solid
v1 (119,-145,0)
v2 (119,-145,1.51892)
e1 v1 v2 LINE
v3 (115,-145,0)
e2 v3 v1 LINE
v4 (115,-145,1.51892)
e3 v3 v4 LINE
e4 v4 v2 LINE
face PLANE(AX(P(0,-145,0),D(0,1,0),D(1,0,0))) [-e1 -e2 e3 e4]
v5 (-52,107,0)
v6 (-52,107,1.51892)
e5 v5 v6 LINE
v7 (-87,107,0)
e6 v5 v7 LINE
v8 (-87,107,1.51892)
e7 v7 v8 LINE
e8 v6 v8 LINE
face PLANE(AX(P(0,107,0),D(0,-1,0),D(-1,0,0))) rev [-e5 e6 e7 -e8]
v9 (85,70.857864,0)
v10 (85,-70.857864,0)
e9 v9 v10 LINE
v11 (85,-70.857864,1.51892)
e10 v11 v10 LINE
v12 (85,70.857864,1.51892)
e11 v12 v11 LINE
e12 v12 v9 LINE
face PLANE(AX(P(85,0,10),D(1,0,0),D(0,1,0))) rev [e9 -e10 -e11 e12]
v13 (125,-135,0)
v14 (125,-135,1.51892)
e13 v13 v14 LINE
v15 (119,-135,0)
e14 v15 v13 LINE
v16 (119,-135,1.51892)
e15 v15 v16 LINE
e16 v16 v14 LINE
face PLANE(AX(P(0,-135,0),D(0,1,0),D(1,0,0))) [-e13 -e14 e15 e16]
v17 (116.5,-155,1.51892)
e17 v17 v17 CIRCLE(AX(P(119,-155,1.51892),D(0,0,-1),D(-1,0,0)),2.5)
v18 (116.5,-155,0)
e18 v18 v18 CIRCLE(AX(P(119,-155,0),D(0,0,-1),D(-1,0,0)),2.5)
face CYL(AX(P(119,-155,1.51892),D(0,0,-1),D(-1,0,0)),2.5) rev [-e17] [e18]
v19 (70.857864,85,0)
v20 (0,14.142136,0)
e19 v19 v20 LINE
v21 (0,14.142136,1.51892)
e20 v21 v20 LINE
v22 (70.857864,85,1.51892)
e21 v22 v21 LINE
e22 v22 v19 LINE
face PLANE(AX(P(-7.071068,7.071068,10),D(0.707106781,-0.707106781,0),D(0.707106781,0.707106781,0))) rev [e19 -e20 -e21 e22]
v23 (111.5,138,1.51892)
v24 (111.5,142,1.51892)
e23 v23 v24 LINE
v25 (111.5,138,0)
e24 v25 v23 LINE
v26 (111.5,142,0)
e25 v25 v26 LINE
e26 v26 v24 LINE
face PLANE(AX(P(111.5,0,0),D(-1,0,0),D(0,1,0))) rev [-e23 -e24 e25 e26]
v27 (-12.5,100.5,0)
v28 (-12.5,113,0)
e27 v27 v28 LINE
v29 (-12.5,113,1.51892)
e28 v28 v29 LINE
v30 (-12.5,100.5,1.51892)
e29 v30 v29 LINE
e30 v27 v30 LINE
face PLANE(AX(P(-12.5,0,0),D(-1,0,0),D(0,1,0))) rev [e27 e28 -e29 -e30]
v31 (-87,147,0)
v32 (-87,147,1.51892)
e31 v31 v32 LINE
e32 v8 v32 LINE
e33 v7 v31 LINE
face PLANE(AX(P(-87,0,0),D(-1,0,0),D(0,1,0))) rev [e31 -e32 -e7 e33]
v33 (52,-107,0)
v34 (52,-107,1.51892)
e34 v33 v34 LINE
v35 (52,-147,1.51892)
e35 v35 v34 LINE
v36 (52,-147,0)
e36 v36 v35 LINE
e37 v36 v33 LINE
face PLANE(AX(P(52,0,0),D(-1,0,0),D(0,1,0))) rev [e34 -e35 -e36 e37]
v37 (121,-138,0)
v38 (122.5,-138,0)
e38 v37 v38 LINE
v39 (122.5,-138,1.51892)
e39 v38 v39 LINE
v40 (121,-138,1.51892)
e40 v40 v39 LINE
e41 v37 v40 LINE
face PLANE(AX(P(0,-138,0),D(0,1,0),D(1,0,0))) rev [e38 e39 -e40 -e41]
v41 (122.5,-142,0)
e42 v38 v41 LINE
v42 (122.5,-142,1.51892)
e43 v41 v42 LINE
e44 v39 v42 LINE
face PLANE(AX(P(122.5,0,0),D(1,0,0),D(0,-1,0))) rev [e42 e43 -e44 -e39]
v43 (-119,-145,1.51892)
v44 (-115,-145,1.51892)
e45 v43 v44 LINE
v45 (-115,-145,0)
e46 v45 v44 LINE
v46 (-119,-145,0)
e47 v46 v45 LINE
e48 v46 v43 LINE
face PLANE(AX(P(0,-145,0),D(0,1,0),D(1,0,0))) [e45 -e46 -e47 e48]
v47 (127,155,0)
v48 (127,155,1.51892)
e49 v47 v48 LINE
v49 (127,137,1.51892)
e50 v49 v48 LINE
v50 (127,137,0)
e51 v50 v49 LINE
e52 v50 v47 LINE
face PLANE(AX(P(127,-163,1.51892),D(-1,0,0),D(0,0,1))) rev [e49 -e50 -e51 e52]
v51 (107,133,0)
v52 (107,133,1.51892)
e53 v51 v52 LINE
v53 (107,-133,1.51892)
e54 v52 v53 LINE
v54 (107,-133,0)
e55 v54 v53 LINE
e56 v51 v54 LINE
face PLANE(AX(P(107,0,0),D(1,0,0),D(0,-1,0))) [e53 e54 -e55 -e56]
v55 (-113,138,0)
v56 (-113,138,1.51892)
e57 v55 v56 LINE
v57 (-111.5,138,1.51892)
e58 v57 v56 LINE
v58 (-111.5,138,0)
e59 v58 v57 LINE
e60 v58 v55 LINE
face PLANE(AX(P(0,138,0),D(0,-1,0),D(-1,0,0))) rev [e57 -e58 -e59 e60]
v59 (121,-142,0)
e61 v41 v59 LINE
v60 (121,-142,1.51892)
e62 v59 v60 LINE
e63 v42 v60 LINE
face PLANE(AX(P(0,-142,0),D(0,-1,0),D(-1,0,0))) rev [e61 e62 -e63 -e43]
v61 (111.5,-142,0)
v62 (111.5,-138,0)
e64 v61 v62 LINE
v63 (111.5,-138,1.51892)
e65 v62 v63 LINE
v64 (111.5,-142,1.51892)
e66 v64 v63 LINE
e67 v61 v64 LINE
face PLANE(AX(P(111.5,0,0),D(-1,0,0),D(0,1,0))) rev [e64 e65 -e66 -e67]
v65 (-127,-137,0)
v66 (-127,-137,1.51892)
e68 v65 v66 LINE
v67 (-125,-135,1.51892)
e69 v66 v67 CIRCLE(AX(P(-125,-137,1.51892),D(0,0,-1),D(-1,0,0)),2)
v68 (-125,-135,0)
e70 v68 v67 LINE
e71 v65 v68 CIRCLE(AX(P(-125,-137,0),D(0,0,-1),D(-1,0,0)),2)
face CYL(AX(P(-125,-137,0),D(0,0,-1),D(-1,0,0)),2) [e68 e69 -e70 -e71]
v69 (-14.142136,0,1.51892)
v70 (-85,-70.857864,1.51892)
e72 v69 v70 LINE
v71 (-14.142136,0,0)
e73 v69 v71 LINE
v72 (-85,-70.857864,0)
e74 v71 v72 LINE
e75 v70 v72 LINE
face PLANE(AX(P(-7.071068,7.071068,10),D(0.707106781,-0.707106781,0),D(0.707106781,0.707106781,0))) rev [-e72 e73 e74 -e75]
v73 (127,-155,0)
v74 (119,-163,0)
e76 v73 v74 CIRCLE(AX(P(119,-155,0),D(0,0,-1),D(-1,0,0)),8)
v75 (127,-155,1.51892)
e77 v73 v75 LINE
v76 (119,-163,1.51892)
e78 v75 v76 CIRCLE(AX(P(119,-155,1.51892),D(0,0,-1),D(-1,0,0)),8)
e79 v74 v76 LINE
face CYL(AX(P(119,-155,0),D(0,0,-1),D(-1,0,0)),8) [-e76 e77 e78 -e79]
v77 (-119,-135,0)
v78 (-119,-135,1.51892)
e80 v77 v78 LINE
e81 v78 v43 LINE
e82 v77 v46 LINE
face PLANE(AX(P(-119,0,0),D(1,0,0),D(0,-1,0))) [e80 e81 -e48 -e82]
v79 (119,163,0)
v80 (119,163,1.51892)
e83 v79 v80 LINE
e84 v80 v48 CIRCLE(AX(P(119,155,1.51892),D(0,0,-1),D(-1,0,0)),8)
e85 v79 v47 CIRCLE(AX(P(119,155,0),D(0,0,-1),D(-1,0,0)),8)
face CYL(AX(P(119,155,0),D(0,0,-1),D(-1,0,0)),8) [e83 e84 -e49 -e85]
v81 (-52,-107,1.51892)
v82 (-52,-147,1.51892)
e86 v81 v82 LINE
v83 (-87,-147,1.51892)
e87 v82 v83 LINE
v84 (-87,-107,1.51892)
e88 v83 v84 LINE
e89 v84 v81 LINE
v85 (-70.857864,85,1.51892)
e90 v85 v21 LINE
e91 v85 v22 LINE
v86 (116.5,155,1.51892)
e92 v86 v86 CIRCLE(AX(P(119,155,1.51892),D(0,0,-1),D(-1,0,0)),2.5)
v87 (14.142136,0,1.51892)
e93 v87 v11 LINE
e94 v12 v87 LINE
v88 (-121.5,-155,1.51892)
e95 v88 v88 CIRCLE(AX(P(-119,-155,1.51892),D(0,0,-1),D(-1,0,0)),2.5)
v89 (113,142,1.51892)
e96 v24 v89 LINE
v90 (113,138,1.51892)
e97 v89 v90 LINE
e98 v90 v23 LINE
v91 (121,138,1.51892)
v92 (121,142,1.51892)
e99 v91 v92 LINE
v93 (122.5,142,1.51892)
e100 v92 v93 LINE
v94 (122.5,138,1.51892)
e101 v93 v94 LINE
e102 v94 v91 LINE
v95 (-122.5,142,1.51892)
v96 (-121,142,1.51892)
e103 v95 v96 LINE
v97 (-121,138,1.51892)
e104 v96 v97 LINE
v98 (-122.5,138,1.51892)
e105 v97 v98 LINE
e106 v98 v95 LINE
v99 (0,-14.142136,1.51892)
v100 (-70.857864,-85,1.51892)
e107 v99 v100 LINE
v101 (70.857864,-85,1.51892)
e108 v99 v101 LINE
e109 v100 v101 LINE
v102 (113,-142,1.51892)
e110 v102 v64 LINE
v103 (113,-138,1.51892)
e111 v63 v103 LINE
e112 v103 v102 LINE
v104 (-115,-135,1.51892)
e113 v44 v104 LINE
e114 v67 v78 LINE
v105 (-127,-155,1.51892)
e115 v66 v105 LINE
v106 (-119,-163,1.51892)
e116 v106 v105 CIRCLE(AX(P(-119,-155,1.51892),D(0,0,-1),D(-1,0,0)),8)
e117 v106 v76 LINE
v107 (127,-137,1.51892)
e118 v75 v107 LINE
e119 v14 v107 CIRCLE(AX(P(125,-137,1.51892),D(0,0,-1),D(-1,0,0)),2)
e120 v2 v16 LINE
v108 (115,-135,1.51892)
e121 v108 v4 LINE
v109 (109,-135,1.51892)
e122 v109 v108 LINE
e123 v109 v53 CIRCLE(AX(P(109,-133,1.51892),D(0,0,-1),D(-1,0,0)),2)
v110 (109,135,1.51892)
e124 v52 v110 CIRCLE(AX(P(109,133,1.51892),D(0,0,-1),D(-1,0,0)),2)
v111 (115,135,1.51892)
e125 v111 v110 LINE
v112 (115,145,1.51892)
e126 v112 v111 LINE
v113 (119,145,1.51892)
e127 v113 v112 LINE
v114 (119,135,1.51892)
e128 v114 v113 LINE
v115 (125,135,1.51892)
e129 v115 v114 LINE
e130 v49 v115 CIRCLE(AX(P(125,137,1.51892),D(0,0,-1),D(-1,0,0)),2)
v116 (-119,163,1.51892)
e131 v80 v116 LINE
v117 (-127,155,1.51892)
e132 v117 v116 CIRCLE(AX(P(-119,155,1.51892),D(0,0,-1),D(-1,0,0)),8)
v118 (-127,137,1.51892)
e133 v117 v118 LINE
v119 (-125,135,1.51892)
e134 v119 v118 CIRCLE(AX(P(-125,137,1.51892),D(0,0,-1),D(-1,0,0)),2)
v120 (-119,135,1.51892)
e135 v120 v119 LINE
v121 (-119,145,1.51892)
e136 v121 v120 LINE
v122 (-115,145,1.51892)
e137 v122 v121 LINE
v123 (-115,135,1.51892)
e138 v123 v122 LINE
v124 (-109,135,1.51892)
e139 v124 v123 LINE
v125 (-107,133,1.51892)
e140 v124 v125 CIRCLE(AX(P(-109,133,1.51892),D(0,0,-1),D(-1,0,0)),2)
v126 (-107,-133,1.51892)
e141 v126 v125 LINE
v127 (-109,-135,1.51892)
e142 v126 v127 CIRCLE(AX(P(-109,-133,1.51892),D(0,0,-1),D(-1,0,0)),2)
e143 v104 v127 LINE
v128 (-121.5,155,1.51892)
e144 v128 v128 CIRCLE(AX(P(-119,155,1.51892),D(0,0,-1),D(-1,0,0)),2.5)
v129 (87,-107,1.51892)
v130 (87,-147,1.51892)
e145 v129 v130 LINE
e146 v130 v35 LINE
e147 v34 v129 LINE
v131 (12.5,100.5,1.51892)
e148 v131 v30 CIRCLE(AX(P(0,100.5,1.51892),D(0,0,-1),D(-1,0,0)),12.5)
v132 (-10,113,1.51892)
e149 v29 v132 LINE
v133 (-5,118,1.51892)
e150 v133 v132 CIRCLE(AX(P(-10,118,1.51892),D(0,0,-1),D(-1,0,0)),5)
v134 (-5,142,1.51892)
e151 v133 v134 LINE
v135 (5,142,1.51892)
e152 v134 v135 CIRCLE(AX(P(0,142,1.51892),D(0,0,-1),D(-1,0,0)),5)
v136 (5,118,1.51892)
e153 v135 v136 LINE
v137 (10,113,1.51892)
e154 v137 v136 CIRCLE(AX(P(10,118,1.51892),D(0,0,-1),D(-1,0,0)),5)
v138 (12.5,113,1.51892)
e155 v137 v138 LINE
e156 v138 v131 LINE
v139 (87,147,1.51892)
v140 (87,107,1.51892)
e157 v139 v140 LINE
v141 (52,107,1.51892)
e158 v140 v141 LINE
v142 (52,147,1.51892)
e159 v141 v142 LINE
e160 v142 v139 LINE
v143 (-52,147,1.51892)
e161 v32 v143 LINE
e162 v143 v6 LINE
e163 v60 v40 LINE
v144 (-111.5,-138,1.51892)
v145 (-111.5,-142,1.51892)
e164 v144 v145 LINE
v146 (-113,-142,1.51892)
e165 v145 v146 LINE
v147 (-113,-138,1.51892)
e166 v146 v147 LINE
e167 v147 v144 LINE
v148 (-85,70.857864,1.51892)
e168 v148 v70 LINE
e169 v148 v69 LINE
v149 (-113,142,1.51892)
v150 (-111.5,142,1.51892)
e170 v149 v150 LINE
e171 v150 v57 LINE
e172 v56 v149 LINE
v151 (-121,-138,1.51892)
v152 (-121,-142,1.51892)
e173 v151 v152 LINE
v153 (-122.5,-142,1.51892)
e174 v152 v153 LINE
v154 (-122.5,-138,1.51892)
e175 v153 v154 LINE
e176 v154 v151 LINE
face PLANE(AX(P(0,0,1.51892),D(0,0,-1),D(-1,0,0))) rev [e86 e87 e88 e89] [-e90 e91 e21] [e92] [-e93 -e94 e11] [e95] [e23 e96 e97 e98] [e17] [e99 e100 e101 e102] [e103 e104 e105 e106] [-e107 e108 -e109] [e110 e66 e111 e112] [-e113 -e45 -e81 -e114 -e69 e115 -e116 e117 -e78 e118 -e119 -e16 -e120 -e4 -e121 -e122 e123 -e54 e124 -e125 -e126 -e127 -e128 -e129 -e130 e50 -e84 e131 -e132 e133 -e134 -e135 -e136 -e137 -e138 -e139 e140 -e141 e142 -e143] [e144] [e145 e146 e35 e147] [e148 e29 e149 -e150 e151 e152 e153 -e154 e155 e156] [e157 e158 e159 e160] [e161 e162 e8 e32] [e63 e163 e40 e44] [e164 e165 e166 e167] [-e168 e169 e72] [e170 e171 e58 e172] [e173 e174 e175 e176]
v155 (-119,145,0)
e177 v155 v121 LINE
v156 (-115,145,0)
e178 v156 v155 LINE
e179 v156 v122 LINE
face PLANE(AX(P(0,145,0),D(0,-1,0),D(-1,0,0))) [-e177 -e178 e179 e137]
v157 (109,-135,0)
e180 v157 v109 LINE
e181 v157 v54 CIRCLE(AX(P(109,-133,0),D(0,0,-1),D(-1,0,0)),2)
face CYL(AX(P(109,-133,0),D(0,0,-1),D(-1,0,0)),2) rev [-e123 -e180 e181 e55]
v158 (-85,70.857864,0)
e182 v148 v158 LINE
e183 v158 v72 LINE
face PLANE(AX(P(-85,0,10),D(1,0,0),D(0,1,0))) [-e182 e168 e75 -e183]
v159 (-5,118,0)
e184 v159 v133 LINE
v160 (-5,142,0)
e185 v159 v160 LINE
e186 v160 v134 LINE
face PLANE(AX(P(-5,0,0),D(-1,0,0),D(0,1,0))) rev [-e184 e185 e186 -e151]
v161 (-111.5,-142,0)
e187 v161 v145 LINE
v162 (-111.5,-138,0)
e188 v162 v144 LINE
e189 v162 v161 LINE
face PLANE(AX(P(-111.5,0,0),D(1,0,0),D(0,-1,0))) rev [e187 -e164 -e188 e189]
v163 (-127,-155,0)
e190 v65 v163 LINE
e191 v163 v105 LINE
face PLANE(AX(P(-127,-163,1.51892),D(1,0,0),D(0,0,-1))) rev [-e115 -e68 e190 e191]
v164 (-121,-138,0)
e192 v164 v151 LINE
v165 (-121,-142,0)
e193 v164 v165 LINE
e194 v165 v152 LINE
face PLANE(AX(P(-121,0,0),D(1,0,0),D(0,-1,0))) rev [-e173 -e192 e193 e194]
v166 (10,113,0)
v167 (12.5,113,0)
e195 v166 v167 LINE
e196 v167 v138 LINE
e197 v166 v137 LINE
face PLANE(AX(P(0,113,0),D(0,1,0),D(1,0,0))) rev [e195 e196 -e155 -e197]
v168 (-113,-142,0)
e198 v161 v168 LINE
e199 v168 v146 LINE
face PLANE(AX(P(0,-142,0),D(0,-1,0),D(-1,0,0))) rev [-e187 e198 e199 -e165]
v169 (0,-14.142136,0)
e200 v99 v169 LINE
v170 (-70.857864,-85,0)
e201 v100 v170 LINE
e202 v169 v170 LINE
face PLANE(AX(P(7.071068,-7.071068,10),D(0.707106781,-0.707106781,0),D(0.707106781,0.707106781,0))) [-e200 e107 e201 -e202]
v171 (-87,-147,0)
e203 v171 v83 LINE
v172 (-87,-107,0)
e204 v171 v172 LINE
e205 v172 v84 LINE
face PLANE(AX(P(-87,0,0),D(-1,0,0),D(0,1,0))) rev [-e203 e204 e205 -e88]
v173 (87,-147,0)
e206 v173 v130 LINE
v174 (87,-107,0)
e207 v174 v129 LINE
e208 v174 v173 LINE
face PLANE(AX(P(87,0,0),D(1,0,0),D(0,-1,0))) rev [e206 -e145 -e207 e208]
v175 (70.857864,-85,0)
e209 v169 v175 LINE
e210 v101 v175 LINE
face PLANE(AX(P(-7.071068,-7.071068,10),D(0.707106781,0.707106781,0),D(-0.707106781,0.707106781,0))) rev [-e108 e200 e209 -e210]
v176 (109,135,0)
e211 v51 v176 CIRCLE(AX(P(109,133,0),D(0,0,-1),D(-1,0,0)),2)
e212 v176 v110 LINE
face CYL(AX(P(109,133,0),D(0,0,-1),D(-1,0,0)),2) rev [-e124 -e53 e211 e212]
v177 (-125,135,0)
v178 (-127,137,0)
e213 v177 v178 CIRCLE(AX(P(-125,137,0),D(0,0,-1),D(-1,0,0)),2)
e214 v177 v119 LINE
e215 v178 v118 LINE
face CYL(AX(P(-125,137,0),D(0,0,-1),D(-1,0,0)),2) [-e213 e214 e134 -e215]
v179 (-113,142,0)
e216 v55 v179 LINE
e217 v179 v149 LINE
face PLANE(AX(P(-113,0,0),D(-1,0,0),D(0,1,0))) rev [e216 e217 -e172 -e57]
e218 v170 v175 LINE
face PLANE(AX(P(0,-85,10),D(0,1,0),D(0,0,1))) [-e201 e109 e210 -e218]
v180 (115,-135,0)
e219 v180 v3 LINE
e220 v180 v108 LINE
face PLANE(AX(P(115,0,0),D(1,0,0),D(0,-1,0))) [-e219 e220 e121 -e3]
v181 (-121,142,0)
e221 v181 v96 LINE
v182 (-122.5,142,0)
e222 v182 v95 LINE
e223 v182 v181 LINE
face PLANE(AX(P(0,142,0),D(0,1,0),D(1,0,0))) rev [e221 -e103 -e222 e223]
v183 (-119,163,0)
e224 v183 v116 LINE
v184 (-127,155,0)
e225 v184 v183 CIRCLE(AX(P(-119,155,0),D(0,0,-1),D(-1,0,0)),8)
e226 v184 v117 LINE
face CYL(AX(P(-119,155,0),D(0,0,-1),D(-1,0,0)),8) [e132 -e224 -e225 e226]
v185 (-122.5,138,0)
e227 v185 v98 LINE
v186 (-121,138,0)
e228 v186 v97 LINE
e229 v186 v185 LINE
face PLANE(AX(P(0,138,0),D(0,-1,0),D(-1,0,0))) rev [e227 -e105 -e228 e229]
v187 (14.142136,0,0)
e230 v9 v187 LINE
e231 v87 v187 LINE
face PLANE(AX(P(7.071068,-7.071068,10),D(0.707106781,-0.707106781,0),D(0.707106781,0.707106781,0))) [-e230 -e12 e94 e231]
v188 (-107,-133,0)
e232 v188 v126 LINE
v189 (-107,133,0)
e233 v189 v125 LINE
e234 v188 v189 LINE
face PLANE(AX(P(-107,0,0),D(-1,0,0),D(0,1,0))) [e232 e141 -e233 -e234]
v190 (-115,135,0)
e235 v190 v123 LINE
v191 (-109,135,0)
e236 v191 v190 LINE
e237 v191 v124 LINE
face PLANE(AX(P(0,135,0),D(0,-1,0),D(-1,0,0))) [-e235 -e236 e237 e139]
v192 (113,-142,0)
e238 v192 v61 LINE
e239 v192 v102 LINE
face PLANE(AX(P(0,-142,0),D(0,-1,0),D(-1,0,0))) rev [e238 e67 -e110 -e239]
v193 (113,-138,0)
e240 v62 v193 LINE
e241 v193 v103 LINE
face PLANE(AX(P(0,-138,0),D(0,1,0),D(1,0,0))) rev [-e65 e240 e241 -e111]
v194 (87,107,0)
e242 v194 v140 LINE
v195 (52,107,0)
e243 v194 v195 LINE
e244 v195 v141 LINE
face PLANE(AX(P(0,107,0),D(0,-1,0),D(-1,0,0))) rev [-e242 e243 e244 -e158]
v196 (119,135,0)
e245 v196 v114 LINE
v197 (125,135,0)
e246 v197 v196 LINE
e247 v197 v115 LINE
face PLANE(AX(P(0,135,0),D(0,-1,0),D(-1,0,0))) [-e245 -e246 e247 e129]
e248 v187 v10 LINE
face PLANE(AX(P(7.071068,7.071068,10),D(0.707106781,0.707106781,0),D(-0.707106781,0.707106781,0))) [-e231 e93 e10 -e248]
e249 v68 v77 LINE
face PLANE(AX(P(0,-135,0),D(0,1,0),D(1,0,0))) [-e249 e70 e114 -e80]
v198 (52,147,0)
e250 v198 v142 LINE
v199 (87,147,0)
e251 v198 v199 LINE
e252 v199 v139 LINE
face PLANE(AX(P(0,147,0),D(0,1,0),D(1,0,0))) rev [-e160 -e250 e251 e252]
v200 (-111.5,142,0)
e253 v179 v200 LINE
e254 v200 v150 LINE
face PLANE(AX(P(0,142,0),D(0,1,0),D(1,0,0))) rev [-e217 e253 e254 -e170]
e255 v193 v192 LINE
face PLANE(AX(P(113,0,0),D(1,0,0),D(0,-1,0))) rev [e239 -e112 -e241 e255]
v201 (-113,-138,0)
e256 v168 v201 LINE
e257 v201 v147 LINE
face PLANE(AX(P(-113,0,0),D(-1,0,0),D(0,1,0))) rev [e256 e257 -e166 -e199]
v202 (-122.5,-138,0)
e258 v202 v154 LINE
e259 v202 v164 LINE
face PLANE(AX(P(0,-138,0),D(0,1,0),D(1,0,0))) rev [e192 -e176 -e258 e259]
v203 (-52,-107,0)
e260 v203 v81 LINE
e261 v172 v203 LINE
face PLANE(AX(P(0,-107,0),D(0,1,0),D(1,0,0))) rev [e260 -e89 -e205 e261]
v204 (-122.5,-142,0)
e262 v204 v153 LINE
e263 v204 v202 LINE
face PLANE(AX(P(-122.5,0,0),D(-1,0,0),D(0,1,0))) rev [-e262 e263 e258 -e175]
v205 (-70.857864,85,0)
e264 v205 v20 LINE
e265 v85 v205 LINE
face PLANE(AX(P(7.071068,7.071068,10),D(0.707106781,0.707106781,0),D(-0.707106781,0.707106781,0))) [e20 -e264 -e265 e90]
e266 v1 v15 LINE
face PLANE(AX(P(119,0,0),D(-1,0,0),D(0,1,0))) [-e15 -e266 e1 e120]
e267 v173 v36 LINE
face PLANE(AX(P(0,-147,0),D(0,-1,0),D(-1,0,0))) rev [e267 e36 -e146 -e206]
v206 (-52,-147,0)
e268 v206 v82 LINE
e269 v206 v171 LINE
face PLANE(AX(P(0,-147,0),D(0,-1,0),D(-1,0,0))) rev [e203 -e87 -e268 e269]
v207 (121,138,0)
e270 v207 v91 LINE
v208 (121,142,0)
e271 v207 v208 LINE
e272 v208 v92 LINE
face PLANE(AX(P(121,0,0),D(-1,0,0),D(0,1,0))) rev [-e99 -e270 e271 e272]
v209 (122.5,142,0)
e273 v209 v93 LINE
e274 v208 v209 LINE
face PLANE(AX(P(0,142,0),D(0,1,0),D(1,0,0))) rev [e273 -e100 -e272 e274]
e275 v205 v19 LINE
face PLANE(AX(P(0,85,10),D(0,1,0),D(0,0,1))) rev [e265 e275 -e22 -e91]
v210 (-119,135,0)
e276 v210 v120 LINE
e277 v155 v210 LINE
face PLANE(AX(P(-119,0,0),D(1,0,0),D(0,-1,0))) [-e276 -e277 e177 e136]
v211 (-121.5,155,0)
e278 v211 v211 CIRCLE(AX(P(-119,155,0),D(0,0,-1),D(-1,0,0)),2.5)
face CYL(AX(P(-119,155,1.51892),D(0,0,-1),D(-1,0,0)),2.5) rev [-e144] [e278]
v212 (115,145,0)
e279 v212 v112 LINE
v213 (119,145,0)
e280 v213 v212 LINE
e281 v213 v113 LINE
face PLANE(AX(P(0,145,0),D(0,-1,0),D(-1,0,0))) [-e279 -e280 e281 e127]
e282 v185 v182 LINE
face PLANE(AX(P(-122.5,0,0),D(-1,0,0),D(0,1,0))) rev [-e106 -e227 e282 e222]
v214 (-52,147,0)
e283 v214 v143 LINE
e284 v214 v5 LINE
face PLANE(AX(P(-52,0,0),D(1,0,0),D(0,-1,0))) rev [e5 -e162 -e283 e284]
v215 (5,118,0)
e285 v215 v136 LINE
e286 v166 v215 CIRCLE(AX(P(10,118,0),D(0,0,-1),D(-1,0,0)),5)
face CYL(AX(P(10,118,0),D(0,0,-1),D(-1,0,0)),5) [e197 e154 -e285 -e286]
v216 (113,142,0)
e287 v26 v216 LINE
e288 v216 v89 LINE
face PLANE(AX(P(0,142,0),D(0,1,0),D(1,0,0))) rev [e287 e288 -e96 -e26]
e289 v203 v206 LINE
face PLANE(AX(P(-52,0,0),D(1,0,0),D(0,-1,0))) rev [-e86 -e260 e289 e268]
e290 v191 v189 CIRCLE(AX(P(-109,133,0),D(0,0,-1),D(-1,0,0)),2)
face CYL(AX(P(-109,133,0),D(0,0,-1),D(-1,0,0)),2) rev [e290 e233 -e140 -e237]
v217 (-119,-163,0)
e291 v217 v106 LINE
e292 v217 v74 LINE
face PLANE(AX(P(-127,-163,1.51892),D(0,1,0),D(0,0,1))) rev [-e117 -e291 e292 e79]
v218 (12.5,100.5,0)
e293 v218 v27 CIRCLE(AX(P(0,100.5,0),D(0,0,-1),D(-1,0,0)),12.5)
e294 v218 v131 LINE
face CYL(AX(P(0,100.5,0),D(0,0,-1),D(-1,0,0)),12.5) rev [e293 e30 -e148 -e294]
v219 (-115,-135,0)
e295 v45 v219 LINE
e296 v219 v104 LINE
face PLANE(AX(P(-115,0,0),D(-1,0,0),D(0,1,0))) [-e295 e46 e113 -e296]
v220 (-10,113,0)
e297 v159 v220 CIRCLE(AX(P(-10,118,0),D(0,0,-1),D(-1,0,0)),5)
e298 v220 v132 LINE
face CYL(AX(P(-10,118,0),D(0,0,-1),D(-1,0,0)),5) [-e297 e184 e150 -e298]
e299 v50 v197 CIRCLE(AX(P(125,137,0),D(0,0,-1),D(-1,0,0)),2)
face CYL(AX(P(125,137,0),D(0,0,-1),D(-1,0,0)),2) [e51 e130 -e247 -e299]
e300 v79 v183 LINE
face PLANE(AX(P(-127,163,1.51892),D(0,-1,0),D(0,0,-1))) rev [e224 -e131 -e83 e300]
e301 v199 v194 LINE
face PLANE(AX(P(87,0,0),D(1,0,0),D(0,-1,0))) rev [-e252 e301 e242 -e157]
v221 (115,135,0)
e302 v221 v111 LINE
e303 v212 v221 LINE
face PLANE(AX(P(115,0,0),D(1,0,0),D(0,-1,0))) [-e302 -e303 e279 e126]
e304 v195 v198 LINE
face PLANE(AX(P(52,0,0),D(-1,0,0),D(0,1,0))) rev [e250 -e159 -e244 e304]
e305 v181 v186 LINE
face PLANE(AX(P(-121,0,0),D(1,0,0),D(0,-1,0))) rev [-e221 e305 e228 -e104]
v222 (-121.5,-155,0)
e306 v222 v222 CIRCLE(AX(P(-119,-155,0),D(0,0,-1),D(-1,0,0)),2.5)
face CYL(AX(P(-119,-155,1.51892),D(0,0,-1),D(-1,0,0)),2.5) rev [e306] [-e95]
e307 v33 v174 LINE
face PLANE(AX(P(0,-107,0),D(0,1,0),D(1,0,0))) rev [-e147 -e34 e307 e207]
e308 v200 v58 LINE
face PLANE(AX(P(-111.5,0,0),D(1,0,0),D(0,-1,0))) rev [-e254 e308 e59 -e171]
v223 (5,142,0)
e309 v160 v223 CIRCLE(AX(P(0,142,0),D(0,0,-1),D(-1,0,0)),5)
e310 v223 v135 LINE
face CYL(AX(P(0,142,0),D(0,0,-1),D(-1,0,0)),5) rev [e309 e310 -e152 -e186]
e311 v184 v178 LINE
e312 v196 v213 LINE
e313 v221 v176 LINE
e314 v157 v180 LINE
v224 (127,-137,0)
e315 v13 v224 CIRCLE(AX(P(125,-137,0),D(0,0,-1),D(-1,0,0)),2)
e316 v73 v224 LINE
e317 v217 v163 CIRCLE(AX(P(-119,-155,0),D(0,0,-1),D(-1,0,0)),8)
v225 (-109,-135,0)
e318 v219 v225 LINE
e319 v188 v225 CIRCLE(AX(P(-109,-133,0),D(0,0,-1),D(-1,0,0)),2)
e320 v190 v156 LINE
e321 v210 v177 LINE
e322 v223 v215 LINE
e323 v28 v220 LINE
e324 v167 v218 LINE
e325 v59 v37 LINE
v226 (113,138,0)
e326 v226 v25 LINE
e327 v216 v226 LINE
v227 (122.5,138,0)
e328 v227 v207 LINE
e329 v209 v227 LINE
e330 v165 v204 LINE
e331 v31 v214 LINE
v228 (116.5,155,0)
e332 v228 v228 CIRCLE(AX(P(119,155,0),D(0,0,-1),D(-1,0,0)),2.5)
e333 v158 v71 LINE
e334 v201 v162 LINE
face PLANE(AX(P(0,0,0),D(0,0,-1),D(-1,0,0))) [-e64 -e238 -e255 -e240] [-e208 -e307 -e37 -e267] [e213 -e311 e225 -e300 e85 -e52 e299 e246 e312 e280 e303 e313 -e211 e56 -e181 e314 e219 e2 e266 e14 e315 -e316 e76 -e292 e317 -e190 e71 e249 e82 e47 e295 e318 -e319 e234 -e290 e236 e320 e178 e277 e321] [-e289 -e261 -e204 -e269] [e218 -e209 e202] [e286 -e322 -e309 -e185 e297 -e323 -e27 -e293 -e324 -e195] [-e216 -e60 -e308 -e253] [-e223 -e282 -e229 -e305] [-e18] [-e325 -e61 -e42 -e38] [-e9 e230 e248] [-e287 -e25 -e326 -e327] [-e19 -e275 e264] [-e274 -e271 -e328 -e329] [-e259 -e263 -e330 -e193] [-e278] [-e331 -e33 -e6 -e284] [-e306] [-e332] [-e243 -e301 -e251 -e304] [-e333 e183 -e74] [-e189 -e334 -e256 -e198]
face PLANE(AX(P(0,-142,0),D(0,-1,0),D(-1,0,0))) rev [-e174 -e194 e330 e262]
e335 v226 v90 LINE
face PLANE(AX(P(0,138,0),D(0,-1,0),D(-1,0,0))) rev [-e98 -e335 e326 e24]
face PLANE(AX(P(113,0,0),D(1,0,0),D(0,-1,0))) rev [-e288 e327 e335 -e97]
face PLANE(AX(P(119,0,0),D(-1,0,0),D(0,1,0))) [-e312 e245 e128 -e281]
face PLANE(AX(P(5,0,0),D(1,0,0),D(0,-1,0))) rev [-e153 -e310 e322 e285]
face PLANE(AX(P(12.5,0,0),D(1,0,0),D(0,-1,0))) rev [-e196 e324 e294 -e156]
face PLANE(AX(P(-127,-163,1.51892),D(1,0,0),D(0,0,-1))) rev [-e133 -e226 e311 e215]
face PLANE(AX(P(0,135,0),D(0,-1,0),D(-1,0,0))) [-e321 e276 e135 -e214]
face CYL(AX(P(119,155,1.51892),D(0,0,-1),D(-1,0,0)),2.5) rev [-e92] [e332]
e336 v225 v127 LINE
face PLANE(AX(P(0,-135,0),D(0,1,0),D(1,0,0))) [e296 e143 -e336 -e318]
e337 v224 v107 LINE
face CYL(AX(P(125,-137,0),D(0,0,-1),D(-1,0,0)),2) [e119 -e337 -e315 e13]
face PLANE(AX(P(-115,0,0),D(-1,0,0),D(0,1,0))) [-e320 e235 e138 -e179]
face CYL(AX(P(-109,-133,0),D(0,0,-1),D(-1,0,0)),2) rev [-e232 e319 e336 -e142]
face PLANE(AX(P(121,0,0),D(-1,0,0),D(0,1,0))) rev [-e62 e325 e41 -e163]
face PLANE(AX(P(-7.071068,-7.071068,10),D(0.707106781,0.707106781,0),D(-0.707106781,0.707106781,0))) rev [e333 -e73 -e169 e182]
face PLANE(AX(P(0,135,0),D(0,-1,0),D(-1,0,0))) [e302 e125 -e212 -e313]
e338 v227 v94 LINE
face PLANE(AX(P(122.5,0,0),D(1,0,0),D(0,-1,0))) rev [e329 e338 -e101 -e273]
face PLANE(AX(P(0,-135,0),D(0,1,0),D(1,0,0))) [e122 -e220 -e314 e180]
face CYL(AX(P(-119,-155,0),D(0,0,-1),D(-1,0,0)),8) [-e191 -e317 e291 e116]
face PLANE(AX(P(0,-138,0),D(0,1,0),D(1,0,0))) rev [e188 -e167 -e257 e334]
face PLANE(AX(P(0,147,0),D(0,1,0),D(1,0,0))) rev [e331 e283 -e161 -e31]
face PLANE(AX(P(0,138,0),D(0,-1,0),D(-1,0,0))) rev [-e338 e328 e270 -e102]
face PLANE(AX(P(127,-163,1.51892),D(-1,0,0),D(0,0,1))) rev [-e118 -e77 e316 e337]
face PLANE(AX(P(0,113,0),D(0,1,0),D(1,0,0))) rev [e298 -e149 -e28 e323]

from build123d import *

# Parameters (mm, degrees)
SKETCH1_W          = 254
SKETCH1_H          = 326
BASE_FLANGE1_DEPTH = 1.51892
SKETCH6_R          = 2.5
SKETCH6_W          = 1.5
SKETCH6_H          = 4
SKETCH6_W_2        = 35
SKETCH6_H_2        = 40
CUT_EXTRUDE1_DEPTH = 10
CUT_EXTRUDE2_DEPTH = 10


# Sheet-metal steps are written as plain solids
with BuildPart() as part:
    # Sketch1 → Base-Flange1 (new body)
    with BuildSketch(Plane.XY):
        Rectangle(SKETCH1_W, SKETCH1_H)
    extrude(amount=BASE_FLANGE1_DEPTH)

    # Sketch6 → Cut-Extrude1 (cut)
    with BuildSketch(Plane(origin=(0, 0, 0), x_dir=(-1, 0, 0), z_dir=(0, 0, -1))):
        with BuildLine():
            ThreePointArc((-124.99999998, 135), (-126.414213542, 135.585786438), (-126.99999998, 137))
            Line((-127, 137), (-127, -137))
            ThreePointArc((-126.99999998, -137), (-126.414213542, -135.585786438), (-124.99999998, -135))
            Line((-124.99999998, -135), (-119, -135))
            Line((-119, -135), (-119, -145))
            Line((-119, -145), (-115, -145))
            Line((-115, -145), (-115, -135))
            Line((-115, -135), (-109, -135))
            ThreePointArc((-109, -135), (-107.585786438, -134.414213562), (-107, -133))
            Line((-107, -133), (-107, 133))
            ThreePointArc((-107, 133), (-107.585786438, 134.414213562), (-109, 135))
            Line((-109, 135), (-115, 135))
            Line((-115, 135), (-115, 145))
            Line((-115, 145), (-119, 145))
            Line((-119, 145), (-119, 135))
            Line((-119, 135), (-124.99999998, 135))
        make_face()
        with Locations((-119, 155)):
            Circle(SKETCH6_R)
        with BuildLine():
            ThreePointArc((-126.99999998, 155), (-124.656854247, 160.656854252), (-119, 163))
            Line((-119, 163), (-127, 163))
            Line((-127, 163), (-127, 155))
        make_face()
        with Locations((-121.75, 140)):
            Rectangle(SKETCH6_W, SKETCH6_H)
        with Locations((-112.25, 140)):
            Rectangle(SKETCH6_W, SKETCH6_H)
        with Locations((-69.5, 127)):
            Rectangle(SKETCH6_W_2, SKETCH6_H_2)
        with BuildLine():
            Line((127, -137), (127, 137))
            ThreePointArc((127, 137), (126.414213562, 135.585786438), (125, 135))
            Line((125, 135), (119, 135))
            Line((119, 135), (119, 145))
            Line((119, 145), (115, 145))
            Line((115, 145), (115, 135))
            Line((115, 135), (109, 135))
            ThreePointArc((109, 135), (107.585786438, 134.414213562), (107, 133))
            Line((107, 133), (107, -133))
            ThreePointArc((107, -133), (107.585786438, -134.414213562), (109, -135))
            Line((109, -135), (115, -135))
            Line((115, -135), (115, -145))
            Line((115, -145), (119, -145))
            Line((119, -145), (119, -135))
            Line((119, -135), (125, -135))
            ThreePointArc((125, -135), (126.414213562, -135.585786438), (127, -137))
        make_face()
        with Locations((121.75, 140)):
            Rectangle(SKETCH6_W, SKETCH6_H)
        with Locations((112.25, 140)):
            Rectangle(SKETCH6_W, SKETCH6_H)
        with Locations((119, 155)):
            Circle(SKETCH6_R)
        with Locations((69.5, 127)):
            Rectangle(SKETCH6_W_2, SKETCH6_H_2)
        with BuildLine():
            ThreePointArc((119, 163), (124.656854249, 160.656854249), (127, 155))
            Line((127, 155), (127, 163))
            Line((127, 163), (119, 163))
        make_face()
        with BuildLine():
            ThreePointArc((-10, 113), (-6.464466094, 114.464466094), (-5, 118))
            Line((-5, 118), (-5, 142))
            ThreePointArc((-5, 142), (0, 147), (5, 142))
            Line((5, 142), (5, 118))
            ThreePointArc((5, 118), (6.464466094, 114.464466094), (10, 113))
            Line((10, 113), (12.5, 113))
            Line((12.5, 113), (12.5, 100.5))
            ThreePointArc((12.5, 100.5), (0, 88), (-12.5, 100.5))
            Line((-12.5, 100.5), (-12.5, 113))
            Line((-12.5, 113), (-10, 113))
        make_face()
        with Locations((-69.5, -127)):
            Rectangle(SKETCH6_W_2, SKETCH6_H_2)
        with Locations((-119, -155)):
            Circle(SKETCH6_R)
        with BuildLine():
            Line((-127, -163), (-119, -163))
            ThreePointArc((-119, -163), (-124.656854232, -160.656854238), (-126.99999998, -155))
            Line((-127, -155), (-127, -163))
        make_face()
        with Locations((-121.75, -140)):
            Rectangle(SKETCH6_W, SKETCH6_H)
        with Locations((-112.25, -140)):
            Rectangle(SKETCH6_W, SKETCH6_H)
        with Locations((69.5, -127)):
            Rectangle(SKETCH6_W_2, SKETCH6_H_2)
        with Locations((112.25, -140)):
            Rectangle(SKETCH6_W, SKETCH6_H)
        with Locations((121.75, -140)):
            Rectangle(SKETCH6_W, SKETCH6_H)
        with Locations((119, -155)):
            Circle(SKETCH6_R)
        with BuildLine():
            Line((127, -163), (127, -155))
            ThreePointArc((127, -155), (124.656854249, -160.656854249), (119, -163))
            Line((119, -163), (127, -163))
        make_face()
    extrude(amount=-CUT_EXTRUDE1_DEPTH, mode=Mode.SUBTRACT)

    # Sketch7 → Cut-Extrude2 (cut)
    with BuildSketch(Plane(origin=(0, 0, 0), x_dir=(-1, 0, 0), z_dir=(0, 0, -1))):
        Polygon((85, -70.857864376), (85, 70.857864376), (14.142135624, 0), align=None)
        Polygon((0, 14.142135624), (70.857864376, 85), (-70.857864376, 85), align=None)
        Polygon((-85, -70.857864376), (-14.142135624, 0), (-85, 70.857864376), align=None)
        Polygon((70.857864376, -85), (0, -14.142135624), (-70.857864376, -85), align=None)
    extrude(amount=-CUT_EXTRUDE2_DEPTH, mode=Mode.SUBTRACT)


solid = part.part
